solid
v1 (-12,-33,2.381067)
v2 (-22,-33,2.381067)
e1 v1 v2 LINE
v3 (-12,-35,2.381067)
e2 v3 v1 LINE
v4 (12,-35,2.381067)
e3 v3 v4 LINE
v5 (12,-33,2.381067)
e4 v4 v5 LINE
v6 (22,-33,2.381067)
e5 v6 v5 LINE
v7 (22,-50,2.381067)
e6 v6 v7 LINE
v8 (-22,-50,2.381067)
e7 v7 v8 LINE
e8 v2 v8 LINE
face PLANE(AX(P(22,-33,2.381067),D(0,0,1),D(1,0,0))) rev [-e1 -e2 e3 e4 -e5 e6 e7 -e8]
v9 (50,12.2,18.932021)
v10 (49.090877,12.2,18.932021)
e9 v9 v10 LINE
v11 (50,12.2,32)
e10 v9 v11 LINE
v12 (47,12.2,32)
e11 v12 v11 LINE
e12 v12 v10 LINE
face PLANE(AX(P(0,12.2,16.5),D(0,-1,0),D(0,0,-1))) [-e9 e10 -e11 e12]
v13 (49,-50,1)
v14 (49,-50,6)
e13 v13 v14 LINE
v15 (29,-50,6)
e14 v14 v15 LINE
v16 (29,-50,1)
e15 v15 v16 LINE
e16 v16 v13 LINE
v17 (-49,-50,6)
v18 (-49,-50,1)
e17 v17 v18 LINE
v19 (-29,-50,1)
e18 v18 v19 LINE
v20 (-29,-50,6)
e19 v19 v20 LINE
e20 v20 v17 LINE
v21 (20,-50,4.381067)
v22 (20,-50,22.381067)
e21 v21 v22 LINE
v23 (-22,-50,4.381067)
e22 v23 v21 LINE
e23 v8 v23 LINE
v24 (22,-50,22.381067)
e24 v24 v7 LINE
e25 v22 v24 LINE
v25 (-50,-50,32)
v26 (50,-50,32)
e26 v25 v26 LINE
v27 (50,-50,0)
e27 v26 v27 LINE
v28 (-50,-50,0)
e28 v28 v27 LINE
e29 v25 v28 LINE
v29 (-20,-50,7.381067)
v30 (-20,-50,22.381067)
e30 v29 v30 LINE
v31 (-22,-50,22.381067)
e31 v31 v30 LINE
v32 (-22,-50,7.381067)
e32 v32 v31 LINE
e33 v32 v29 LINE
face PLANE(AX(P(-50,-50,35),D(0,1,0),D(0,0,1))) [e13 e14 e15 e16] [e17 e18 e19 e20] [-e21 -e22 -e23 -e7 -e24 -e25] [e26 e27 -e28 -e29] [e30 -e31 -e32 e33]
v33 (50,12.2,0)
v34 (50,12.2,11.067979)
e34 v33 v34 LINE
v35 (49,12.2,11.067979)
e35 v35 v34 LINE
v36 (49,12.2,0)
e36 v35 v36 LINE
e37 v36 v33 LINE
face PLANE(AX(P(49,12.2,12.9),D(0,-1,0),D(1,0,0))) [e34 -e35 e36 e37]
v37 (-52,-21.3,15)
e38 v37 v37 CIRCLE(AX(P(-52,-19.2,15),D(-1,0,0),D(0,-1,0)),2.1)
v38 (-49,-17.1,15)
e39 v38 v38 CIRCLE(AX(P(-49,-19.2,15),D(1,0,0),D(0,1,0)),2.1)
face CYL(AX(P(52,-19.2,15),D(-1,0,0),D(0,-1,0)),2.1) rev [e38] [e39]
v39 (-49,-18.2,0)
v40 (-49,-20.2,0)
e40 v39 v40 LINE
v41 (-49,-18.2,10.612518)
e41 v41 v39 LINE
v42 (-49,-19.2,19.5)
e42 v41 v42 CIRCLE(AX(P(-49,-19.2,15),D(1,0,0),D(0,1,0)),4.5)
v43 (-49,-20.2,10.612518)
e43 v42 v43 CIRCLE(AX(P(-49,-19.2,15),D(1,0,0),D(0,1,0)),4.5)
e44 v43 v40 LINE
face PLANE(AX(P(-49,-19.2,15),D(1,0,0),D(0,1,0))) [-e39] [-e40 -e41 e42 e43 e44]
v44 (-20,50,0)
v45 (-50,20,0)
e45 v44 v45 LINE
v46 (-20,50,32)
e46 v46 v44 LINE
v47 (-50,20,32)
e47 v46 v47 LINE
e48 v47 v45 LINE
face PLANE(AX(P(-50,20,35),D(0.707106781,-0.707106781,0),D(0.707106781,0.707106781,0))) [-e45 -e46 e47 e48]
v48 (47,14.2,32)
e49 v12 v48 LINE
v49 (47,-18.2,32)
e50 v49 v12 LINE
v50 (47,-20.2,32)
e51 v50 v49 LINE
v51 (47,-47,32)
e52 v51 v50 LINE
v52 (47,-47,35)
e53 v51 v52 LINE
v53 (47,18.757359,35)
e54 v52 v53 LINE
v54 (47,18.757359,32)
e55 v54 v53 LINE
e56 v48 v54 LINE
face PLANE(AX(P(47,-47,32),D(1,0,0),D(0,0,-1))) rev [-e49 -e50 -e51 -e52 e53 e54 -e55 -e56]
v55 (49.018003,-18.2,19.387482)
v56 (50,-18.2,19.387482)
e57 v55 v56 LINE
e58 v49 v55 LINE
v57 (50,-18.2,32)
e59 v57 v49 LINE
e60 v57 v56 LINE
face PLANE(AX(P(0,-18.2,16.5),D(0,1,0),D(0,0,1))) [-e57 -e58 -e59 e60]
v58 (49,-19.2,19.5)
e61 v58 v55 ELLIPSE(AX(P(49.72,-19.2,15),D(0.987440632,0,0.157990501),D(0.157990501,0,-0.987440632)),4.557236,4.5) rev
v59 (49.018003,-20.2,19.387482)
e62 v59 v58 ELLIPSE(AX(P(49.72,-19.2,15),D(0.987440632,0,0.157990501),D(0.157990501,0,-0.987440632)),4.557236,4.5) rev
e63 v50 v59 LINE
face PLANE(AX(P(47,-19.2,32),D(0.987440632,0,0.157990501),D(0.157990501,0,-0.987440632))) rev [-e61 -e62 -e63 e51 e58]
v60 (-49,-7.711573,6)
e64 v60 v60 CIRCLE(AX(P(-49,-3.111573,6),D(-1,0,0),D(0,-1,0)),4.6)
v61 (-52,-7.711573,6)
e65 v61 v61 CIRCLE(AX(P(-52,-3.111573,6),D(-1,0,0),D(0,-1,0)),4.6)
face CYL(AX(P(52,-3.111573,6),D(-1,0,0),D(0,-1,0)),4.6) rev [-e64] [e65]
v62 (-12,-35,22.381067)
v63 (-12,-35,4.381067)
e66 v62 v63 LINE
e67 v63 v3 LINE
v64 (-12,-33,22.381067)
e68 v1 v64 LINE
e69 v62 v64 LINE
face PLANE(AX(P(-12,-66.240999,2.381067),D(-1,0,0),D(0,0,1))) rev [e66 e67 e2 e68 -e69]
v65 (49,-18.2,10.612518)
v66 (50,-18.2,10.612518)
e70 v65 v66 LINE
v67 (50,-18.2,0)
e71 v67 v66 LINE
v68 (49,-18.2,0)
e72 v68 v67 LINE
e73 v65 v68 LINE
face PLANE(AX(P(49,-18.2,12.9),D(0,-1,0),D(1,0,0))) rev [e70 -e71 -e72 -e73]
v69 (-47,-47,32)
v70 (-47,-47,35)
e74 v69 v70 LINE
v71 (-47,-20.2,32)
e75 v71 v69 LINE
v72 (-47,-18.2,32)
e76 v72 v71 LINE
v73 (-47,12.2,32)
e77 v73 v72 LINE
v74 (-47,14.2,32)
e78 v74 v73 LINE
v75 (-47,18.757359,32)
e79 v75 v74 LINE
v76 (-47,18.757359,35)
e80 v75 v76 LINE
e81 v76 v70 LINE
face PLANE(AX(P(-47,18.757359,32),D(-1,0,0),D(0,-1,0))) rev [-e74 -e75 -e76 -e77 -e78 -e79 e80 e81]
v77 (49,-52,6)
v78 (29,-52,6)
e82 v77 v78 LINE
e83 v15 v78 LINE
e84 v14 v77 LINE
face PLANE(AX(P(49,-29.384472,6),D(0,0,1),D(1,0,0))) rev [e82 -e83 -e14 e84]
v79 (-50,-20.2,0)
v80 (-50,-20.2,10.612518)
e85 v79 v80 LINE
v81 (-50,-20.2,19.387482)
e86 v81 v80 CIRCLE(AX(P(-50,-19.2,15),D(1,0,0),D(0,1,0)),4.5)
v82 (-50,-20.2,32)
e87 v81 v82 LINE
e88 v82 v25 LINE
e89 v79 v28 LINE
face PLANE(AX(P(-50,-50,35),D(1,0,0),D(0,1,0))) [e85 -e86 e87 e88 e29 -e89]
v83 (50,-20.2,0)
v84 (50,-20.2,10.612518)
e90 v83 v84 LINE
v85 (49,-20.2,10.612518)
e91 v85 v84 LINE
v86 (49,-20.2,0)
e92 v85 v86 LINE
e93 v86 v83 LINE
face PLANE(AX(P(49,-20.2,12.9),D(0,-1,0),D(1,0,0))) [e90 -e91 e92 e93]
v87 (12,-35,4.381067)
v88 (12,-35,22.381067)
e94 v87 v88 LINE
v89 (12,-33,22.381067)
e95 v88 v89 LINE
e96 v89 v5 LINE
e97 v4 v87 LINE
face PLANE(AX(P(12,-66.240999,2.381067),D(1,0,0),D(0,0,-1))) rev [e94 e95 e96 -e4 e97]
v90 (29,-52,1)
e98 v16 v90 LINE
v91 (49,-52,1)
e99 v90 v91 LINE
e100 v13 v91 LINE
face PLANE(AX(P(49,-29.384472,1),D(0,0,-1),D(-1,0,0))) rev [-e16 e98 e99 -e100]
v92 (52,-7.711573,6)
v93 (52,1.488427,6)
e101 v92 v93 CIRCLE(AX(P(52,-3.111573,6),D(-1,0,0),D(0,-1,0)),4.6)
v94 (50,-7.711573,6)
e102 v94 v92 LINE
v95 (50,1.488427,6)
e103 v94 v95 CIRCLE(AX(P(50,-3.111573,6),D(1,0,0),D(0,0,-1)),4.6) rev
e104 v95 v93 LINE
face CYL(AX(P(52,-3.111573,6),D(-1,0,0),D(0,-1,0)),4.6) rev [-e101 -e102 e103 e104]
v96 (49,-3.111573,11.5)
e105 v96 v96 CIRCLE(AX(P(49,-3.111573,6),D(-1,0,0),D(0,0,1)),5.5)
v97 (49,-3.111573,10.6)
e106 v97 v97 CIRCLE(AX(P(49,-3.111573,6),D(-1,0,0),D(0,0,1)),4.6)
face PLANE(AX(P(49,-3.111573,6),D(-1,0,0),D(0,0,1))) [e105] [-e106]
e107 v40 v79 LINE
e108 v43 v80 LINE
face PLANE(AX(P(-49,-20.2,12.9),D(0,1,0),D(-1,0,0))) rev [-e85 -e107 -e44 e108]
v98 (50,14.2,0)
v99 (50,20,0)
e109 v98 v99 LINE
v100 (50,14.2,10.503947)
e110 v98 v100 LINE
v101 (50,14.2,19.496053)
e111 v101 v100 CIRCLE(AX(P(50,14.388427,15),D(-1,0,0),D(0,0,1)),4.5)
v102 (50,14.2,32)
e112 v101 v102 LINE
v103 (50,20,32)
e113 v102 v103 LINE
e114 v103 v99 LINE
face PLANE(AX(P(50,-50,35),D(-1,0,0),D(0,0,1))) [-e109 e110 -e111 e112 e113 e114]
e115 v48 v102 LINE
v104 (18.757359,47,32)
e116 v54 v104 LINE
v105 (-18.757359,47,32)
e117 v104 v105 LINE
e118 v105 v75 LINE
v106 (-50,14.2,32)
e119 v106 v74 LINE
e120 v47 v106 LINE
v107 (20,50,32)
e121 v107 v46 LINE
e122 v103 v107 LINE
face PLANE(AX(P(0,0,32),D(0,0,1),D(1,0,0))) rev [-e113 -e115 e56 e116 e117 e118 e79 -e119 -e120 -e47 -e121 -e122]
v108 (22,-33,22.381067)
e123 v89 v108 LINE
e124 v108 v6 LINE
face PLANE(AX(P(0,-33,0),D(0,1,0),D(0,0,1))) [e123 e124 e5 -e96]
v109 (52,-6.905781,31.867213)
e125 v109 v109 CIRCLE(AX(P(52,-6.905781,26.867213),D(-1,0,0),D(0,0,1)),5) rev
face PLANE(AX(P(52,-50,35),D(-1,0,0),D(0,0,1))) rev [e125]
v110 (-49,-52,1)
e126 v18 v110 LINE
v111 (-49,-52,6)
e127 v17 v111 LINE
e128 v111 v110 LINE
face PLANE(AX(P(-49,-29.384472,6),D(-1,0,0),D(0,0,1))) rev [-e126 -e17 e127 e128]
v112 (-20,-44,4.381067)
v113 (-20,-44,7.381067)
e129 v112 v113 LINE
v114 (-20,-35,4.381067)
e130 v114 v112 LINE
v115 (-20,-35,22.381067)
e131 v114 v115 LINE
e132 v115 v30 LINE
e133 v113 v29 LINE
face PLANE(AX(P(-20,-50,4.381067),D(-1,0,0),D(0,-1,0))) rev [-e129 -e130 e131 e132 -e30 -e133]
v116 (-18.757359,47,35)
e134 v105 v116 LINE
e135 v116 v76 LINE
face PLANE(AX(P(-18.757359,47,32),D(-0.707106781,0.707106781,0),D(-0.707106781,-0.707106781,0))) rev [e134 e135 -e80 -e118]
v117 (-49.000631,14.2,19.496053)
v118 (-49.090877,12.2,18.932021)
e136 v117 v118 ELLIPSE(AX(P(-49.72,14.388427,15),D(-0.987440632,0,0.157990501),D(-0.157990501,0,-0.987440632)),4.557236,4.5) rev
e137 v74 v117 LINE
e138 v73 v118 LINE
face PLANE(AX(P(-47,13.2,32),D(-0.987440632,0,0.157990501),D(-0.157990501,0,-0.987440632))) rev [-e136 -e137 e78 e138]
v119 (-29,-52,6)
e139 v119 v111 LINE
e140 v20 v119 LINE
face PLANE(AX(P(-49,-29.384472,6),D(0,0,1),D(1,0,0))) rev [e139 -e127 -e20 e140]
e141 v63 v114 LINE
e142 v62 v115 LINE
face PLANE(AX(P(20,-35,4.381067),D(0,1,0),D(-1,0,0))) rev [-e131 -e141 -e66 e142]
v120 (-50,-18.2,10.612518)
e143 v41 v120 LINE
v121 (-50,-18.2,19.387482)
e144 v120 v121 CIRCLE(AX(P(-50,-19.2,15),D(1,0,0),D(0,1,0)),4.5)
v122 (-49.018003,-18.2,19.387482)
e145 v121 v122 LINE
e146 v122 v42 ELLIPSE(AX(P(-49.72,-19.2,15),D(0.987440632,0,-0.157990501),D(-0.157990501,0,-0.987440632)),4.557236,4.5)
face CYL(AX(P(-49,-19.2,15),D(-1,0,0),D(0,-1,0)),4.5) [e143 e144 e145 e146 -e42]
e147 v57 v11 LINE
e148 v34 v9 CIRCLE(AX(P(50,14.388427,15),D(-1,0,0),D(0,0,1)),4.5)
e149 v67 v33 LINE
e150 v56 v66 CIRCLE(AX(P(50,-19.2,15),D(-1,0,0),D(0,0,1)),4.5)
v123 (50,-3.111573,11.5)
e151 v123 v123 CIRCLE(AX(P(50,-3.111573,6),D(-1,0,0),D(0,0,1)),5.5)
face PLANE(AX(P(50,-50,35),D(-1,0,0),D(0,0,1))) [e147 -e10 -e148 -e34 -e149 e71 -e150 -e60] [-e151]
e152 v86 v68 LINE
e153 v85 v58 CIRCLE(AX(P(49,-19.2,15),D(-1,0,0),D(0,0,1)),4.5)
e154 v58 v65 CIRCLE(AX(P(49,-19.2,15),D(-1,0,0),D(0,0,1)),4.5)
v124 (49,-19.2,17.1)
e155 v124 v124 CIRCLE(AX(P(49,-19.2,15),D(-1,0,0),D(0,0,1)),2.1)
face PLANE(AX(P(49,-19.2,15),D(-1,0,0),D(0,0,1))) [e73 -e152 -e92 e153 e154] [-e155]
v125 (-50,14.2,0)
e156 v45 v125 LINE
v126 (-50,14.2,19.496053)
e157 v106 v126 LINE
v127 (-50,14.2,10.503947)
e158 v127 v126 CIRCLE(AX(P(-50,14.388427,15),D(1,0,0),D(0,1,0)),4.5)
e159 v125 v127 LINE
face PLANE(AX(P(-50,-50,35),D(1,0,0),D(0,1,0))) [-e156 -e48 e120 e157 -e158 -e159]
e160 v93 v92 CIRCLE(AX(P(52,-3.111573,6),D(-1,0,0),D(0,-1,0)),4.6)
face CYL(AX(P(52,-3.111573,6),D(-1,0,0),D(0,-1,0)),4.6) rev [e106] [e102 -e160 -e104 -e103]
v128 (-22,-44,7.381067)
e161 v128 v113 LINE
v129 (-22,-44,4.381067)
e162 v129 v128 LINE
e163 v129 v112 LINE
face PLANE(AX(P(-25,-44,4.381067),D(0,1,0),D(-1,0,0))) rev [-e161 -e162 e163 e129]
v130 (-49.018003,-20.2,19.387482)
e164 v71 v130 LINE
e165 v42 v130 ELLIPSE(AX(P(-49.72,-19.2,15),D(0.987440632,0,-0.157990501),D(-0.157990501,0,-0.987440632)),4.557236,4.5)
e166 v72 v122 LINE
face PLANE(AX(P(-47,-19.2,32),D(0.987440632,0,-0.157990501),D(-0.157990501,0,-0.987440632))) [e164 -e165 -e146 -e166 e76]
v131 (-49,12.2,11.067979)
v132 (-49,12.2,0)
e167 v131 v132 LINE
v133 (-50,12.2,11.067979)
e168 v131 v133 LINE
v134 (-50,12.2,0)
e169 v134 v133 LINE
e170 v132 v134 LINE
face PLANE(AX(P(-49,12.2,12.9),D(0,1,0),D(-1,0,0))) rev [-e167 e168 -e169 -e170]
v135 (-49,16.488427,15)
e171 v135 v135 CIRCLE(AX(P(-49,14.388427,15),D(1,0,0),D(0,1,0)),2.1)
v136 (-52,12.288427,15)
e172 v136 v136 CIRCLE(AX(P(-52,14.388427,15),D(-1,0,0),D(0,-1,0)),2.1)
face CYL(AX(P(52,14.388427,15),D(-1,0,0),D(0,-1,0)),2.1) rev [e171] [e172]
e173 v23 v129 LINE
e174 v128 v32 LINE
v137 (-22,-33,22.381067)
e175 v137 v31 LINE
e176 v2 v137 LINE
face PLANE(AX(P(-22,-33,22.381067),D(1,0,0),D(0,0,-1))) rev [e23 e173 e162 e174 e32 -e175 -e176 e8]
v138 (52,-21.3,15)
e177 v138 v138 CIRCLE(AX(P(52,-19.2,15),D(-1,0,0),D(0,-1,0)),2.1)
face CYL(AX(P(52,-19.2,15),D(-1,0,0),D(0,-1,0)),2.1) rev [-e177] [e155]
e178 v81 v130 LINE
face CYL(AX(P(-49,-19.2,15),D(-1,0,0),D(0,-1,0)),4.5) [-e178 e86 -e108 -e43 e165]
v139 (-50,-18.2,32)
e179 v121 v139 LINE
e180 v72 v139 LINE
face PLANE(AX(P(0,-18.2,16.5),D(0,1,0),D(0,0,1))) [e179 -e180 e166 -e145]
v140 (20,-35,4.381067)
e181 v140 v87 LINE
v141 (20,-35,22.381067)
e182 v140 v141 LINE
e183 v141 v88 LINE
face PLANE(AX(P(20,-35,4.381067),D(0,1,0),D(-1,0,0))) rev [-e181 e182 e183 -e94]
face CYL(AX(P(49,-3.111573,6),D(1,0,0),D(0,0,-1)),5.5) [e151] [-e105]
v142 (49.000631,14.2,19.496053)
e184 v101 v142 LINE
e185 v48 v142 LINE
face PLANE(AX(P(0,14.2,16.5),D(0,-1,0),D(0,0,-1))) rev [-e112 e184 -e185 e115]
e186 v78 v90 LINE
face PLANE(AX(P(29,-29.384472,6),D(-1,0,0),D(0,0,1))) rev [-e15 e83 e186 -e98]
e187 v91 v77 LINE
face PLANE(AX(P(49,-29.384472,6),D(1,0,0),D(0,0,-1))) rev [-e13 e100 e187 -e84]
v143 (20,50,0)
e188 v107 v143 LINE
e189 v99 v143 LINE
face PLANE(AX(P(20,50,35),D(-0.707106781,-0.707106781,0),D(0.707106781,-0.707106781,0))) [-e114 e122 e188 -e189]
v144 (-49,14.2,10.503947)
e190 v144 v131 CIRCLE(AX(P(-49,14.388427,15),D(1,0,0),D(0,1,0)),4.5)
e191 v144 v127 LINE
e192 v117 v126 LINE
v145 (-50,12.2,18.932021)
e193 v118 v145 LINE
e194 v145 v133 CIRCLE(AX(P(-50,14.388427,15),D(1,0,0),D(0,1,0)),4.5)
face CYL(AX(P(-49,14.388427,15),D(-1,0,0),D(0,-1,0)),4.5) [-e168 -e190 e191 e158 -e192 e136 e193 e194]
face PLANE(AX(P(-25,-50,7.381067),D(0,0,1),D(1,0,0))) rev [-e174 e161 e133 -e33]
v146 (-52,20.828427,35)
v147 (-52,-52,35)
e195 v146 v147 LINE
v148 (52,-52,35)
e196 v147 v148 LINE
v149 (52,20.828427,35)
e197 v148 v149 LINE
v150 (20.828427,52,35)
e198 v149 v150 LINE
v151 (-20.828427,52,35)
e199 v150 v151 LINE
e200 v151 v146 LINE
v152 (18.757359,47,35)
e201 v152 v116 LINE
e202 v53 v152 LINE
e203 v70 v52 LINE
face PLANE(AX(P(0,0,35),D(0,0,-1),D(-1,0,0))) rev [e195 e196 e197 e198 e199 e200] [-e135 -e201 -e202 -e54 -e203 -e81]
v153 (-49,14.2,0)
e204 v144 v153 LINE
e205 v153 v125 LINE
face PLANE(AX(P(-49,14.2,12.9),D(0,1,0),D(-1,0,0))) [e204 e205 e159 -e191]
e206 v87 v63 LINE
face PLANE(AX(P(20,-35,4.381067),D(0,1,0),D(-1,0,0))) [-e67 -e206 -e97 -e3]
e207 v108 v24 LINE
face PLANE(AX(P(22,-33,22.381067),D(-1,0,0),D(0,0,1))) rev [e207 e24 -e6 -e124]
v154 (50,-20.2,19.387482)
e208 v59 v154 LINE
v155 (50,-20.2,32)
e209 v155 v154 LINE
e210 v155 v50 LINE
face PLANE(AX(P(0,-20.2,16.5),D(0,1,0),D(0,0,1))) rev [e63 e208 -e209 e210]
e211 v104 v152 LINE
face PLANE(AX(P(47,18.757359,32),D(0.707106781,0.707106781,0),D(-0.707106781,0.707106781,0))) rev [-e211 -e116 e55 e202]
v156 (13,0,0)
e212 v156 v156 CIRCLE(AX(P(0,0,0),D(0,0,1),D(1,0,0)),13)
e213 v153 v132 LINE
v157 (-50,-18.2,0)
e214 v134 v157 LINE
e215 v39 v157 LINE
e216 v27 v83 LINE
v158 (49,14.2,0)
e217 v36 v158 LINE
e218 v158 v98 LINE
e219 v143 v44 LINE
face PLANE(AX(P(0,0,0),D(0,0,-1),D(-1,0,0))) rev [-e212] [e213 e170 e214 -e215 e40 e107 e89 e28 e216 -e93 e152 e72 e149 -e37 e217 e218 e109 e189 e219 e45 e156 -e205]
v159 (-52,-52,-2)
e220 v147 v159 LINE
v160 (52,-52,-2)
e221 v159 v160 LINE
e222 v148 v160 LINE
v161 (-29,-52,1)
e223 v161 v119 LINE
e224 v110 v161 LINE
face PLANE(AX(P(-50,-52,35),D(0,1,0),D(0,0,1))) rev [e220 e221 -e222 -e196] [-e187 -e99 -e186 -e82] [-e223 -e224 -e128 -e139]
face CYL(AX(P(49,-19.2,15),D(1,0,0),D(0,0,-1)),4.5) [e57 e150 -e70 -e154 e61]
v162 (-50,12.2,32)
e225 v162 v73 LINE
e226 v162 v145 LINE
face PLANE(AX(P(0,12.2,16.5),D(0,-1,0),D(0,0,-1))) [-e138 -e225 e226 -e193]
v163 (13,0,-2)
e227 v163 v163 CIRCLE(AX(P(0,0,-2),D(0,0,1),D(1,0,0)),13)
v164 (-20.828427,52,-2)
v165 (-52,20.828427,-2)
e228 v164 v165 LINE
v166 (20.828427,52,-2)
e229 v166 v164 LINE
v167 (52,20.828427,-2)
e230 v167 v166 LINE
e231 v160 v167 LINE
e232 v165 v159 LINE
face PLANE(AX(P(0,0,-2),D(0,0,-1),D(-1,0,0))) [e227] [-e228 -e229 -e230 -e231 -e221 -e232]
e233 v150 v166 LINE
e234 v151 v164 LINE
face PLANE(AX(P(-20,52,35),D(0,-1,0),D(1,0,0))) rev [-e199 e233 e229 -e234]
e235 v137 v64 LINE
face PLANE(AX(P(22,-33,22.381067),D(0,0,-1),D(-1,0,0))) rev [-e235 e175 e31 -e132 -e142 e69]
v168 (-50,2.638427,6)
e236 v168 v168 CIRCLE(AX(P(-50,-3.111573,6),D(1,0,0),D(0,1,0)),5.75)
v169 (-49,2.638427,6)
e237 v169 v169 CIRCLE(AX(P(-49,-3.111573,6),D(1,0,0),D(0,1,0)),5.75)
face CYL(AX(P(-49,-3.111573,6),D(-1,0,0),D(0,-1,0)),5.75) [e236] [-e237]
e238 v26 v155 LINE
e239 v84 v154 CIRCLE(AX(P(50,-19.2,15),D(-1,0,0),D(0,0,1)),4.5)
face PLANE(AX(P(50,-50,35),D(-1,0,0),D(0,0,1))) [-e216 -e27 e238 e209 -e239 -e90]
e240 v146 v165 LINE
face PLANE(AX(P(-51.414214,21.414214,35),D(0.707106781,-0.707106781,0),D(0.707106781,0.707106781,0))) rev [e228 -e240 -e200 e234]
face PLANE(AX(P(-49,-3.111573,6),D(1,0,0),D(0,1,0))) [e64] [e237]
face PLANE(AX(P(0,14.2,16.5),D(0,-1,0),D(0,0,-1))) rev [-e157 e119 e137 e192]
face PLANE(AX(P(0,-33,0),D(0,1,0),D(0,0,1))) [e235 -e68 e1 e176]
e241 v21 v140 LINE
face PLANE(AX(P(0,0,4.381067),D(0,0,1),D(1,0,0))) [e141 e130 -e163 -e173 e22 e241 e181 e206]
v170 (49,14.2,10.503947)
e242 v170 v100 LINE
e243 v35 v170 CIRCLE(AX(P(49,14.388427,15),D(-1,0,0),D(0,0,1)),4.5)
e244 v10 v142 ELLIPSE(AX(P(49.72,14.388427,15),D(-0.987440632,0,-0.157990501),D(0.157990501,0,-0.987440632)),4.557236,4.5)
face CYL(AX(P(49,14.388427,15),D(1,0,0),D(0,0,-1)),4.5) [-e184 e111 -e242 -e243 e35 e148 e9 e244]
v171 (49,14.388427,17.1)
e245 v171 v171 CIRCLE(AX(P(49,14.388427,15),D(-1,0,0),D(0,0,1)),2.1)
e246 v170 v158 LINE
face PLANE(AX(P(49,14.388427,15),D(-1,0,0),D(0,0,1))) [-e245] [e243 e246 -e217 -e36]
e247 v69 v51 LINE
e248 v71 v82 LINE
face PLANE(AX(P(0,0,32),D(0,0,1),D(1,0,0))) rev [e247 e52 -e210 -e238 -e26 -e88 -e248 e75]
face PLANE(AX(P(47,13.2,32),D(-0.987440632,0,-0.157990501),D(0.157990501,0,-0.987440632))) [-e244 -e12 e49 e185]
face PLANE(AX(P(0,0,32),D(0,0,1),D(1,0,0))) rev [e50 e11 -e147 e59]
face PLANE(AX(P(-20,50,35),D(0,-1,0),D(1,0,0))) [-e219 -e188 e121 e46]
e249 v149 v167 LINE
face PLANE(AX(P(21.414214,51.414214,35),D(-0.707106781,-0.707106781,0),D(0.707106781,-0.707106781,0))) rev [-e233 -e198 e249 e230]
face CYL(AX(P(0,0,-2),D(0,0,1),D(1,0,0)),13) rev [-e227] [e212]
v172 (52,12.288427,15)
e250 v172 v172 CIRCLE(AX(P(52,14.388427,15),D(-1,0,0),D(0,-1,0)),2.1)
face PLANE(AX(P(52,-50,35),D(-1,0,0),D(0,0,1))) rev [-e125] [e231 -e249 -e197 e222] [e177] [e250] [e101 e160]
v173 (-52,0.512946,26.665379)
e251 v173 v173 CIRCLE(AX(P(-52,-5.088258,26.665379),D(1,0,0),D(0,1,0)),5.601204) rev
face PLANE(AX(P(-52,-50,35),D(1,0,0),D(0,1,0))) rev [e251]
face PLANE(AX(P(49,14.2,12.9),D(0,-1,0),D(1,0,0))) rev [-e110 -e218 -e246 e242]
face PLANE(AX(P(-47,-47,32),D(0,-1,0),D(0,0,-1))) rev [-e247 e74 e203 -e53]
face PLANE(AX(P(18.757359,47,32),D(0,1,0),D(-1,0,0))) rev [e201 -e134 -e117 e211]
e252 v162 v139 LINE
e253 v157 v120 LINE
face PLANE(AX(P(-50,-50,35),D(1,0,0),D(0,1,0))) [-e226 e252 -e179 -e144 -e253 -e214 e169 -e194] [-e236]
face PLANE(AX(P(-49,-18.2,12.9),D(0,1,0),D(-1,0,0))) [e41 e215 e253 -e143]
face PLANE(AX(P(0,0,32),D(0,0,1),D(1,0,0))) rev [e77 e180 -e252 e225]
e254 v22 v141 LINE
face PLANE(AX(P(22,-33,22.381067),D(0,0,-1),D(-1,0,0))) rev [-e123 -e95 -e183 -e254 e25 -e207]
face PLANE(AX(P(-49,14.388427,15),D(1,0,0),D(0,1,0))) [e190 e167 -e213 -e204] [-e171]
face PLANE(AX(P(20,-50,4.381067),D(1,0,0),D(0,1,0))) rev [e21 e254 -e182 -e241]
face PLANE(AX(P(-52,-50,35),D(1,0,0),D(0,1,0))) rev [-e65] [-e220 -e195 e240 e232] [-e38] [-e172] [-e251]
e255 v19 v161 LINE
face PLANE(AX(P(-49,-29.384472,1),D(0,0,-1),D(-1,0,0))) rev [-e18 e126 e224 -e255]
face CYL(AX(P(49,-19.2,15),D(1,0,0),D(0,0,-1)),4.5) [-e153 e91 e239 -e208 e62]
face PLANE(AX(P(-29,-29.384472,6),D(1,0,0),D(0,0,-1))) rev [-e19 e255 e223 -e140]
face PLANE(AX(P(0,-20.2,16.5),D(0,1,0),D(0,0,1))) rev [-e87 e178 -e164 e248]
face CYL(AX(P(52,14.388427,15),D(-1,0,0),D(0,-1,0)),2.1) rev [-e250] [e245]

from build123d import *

# Parameters (mm, degrees)
BOSS_EXTRU_1_DEPTH       = 35
COQUE3_T                 = 2
ESQUISSE3_R              = 13
ENL_V_MAT_EXTRU_1_DEPTH  = 82.443231763
ESQUISSE5_W              = 20
ESQUISSE5_H              = 5
ENL_V_MAT_EXTRU_3_DEPTH  = 2
ESQUISSE6_R              = 4.6
ENL_V_MAT_EXTRU_4_DEPTH  = 122.428991596
ESQUISSE7_R              = 2.1
ENL_V_MAT_EXTRU_5_DEPTH  = 122.428991596
ESQUISSE8_W              = 44
ESQUISSE8_H              = 20
BOSS_EXTRU_2_DEPTH       = 17
ESQUISSE9_W              = 40
ESQUISSE9_H              = 15
ENL_V_MAT_EXTRU_7_DEPTH  = 18
ESQUISSE10_W             = 3
ESQUISSE10_H             = 6
ENL_V_MAT_EXTRU_8_DEPTH  = 5
BOSS_EXTRU_4_DEPTH       = 3
ESQUISSE22_R             = 4.5
BOSS_EXTRU_7_DEPTH       = 1
ENL_V_START              = -3
ESQUISSE24_R             = 2.1
ENL_V_MAT_EXTRU_12_DEPTH = 3
ESQUISSE20_R             = 4.5
BOSS_EXTRU_8_DEPTH       = 1
ESQUISSE25_R             = 2.1
ENL_V_MAT_EXTRU_13_DEPTH = 3
BOSS_EXTRU_9_START       = 1
ESQUISSE26_R             = 4.5
BOSS_EXTRU_9_DEPTH       = 1
ESQUISSE27_R             = 2.1
ENL_V_MAT_EXTRU_14_DEPTH = 3
BOSS_EXTRU_10_START      = 1
ESQUISSE28_R             = 4.5
BOSS_EXTRU_10_DEPTH      = 1
ESQUISSE29_R             = 2.1
ENL_V_MAT_EXTRU_15_DEPTH = 3
ESQUISSE34_R             = 5.75
BOSS_EXTRU_16_DEPTH      = 1
ESQUISSE35_R             = 4.6
ENL_V_MAT_EXTRU_19_DEPTH = 1
ESQUISSE36_R             = 5.5
BOSS_EXTRU_17_DEPTH      = 1
ESQUISSE37_R             = 4.6
ENL_V_MAT_EXTRU_20_DEPTH = 1
NERVURE3_REACH           = 96.86
ESQUISSE38_WALL_W        = 204.379203954
ESQUISSE38_WALL_H        = 2
NERVURE4_REACH           = 120.87
ESQUISSE39_WALLS_W       = 252.639353074
ESQUISSE39_WALLS_H       = 2
ESQUISSE40_W             = 24
ESQUISSE40_H             = 20
ENL_V_MAT_EXTRU_21_DEPTH = 2
SYM_TRIE2_START          = 12.2
SYM_TRIE2_OUTLINE_W      = 1
SYM_TRIE2_OUTLINE_H      = 11.067979308
SYM_TRIE2_DEPTH          = 2


with BuildPart() as part:
    # Esquisse1 → Boss.-Extru.1 (new body)
    with BuildSketch(Plane.XY):
        Polygon((-50, 20), (-20, 50), (20, 50), (50, 20), (50, -50), (-50, -50), align=None)
    extrude(amount=BOSS_EXTRU_1_DEPTH)

    # Coque3
    coque3_openings = [part.faces().sort_by_distance(p)[0] for p in [
        (0, -3.956043956, 35),
    ]]
    offset(amount=COQUE3_T, openings=coque3_openings, kind=Kind.INTERSECTION)

    # Esquisse3 → Enlèv. mat.-Extru.1 (cut, through all)
    with BuildSketch(Plane.XY):
        Circle(ESQUISSE3_R)
    extrude(amount=-ENL_V_MAT_EXTRU_1_DEPTH, mode=Mode.SUBTRACT)

    # Esquisse5 → Enlèv. mat.-Extru.3 (cut)
    with BuildSketch(Plane.XZ.offset(52)):
        with Locations((39, 3.5)):
            Rectangle(ESQUISSE5_W, ESQUISSE5_H)
        with Locations((-39, 3.5)):
            Rectangle(ESQUISSE5_W, ESQUISSE5_H)
    extrude(amount=-ENL_V_MAT_EXTRU_3_DEPTH, mode=Mode.SUBTRACT)

    # Esquisse6 → Enlèv. mat.-Extru.4 (cut, through all)
    with BuildSketch(Plane.ZY.offset(52)):
        with Locations(Location((6, -3.111572875, 0), (0, 0, 270))):
            Circle(ESQUISSE6_R)
    extrude(amount=-ENL_V_MAT_EXTRU_4_DEPTH, mode=Mode.SUBTRACT)

    # Esquisse7 → Enlèv. mat.-Extru.5 (cut, through all)
    with BuildSketch(Plane.ZY.offset(52)):
        with Locations(Location((15, 14.388427125, 0), (0, 0, 270))):
            Circle(ESQUISSE7_R)
        with Locations(Location((15, -19.2, 0), (0, 0, 270))):
            Circle(ESQUISSE7_R)
    extrude(amount=-ENL_V_MAT_EXTRU_5_DEPTH, mode=Mode.SUBTRACT)

    # Esquisse8 → Boss.-Extru.2 (add)
    with BuildSketch(Plane(origin=(0, -50, 0), x_dir=(1, 0, 0), z_dir=(0, 1, 0))):
        with Locations((0, -12.381067223)):
            Rectangle(ESQUISSE8_W, ESQUISSE8_H)
    extrude(amount=BOSS_EXTRU_2_DEPTH)

    # Esquisse9 → Enlèv. mat.-Extru.7 (cut)
    with BuildSketch(Plane.XY.offset(22.381067223)):
        with Locations((0, -42.5)):
            Rectangle(ESQUISSE9_W, ESQUISSE9_H)
    extrude(amount=-ENL_V_MAT_EXTRU_7_DEPTH, mode=Mode.SUBTRACT)

    # Esquisse10 → Enlèv. mat.-Extru.8 (cut)
    with BuildSketch(Plane(origin=(-20, 0, 0), x_dir=(0, 0, -1), z_dir=(1, 0, 0))):
        with Locations((-5.881067223, -47)):
            Rectangle(ESQUISSE10_W, ESQUISSE10_H)
    extrude(amount=-ENL_V_MAT_EXTRU_8_DEPTH, mode=Mode.SUBTRACT)

    # Esquisse17 → Boss.-Extru.4 (add)
    with BuildSketch(Plane.XY.offset(35)):
        Polygon((50, -50), (50, 20), (20, 50), (-20, 50), (-50, 20), (-50, -50), align=None)
        Polygon((-47, -47), (47, -47), (47, 18.757359313), (18.757359313, 47), (-18.757359313, 47), (-47, 18.757359313), align=None, mode=Mode.SUBTRACT)
    extrude(amount=-BOSS_EXTRU_4_DEPTH)

    # Esquisse22 → Boss.-Extru.7 (add)
    with BuildSketch(Plane(origin=(-50, 0, 0), x_dir=(0, 0, -1), z_dir=(1, 0, 0))):
        with Locations(Location((-15, -19.2, 0), (0, 0, 90))):
            Circle(ESQUISSE22_R)
    extrude(amount=BOSS_EXTRU_7_DEPTH)

    # Esquisse24 → Enlèv. mat.-Extru.12 (cut)
    with BuildSketch(Plane(origin=(-49, 0, 0), x_dir=(0, 0, -1), z_dir=(1, 0, 0)).offset(ENL_V_START)):
        with Locations(Location((-15, -19.2, 0), (0, 0, 270))):
            Circle(ESQUISSE24_R)
    extrude(amount=ENL_V_MAT_EXTRU_12_DEPTH, mode=Mode.SUBTRACT)

    # Esquisse20 → Boss.-Extru.8 (add)
    with BuildSketch(Plane(origin=(-50, 0, 0), x_dir=(0, 0, -1), z_dir=(1, 0, 0))):
        with Locations(Location((-15, 14.388427125, 0), (0, 0, 90))):
            Circle(ESQUISSE20_R)
    extrude(amount=BOSS_EXTRU_8_DEPTH)

    # Esquisse25 → Enlèv. mat.-Extru.13 (cut)
    with BuildSketch(Plane.ZY.offset(50)):
        with Locations(Location((15, 14.388427125, 0), (0, 0, 270))):
            Circle(ESQUISSE25_R)
    extrude(amount=-ENL_V_MAT_EXTRU_13_DEPTH, mode=Mode.SUBTRACT)

    # Esquisse26 → Boss.-Extru.9 (add)
    with BuildSketch(Plane.ZY.offset(-50).offset(BOSS_EXTRU_9_START)):
        with Locations(Location((15, 14.388427125, 0), (0, 0, 90))):
            Circle(ESQUISSE26_R)
    extrude(amount=-BOSS_EXTRU_9_DEPTH)

    # Esquisse27 → Enlèv. mat.-Extru.14 (cut)
    with BuildSketch(Plane(origin=(50, 0, 0), x_dir=(0, 0, -1), z_dir=(1, 0, 0)).offset(ENL_V_START)):
        with Locations(Location((-15, 14.388427125, 0), (0, 0, 270))):
            Circle(ESQUISSE27_R)
    extrude(amount=ENL_V_MAT_EXTRU_14_DEPTH, mode=Mode.SUBTRACT)

    # Esquisse28 → Boss.-Extru.10 (add)
    with BuildSketch(Plane.ZY.offset(-50).offset(BOSS_EXTRU_10_START)):
        with Locations(Location((15, -19.2, 0), (0, 0, 90))):
            Circle(ESQUISSE28_R)
    extrude(amount=-BOSS_EXTRU_10_DEPTH)

    # Esquisse29 → Enlèv. mat.-Extru.15 (cut)
    with BuildSketch(Plane.ZY.offset(-49)):
        with Locations(Location((15, -19.2, 0), (0, 0, 270))):
            Circle(ESQUISSE29_R)
    extrude(amount=-ENL_V_MAT_EXTRU_15_DEPTH, mode=Mode.SUBTRACT)

    # Esquisse34 → Boss.-Extru.16 (add)
    with BuildSketch(Plane(origin=(-50, 0, 0), x_dir=(0, 0, -1), z_dir=(1, 0, 0))):
        with Locations(Location((-6, -3.111572875, 0), (0, 0, 90))):
            Circle(ESQUISSE34_R)
    extrude(amount=BOSS_EXTRU_16_DEPTH)

    # Esquisse35 → Enlèv. mat.-Extru.19 (cut)
    with BuildSketch(Plane.ZY.offset(50)):
        with Locations(Location((6, -3.111572875, 0), (0, 0, 270))):
            Circle(ESQUISSE35_R)
    extrude(amount=-ENL_V_MAT_EXTRU_19_DEPTH, mode=Mode.SUBTRACT)

    # Esquisse36 → Boss.-Extru.17 (add)
    with BuildSketch(Plane.ZY.offset(-50)):
        with Locations((6, -3.111572875)):
            Circle(ESQUISSE36_R)
    extrude(amount=BOSS_EXTRU_17_DEPTH)

    # Esquisse37 → Enlèv. mat.-Extru.20 (cut)
    with BuildSketch(Plane.ZY.offset(-49)):
        with Locations(Location((6, -3.111572875, 0), (0, 0, 270))):
            Circle(ESQUISSE37_R)
    extrude(amount=-ENL_V_MAT_EXTRU_20_DEPTH, mode=Mode.SUBTRACT)

    # Esquisse38 wall → Nervure3 (add, up to next)
    with BuildSketch(Plane(origin=(-48, -19.2, 25.75), x_dir=(-0.157990501107, 0, -0.987440631917), z_dir=(-0.987440631917, 0, 0.157990501107)), mode=Mode.PRIVATE) as nervure3_sk1:
        Rectangle(ESQUISSE38_WALL_W, ESQUISSE38_WALL_H)
    nervure3_tool1 = extrude(nervure3_sk1.sketch, amount=NERVURE3_REACH, mode=Mode.PRIVATE) - part.part
    nervure3 = nervure3_tool1.solids().sort_by_distance((-48, -19.2, 25.75))[0]
    add(nervure3)

    # Esquisse39 walls → Nervure4 (add, up to next)
    with BuildSketch(Plane(origin=(-49, 0, 0), x_dir=(0, 0, -1), z_dir=(1, 0, 0)), mode=Mode.PRIVATE) as nervure4_sk1:
        with Locations((-6.45, -19.2)):
            Rectangle(ESQUISSE39_WALLS_W, ESQUISSE39_WALLS_H)
    nervure4_tool1 = extrude(nervure4_sk1.sketch, amount=-NERVURE4_REACH, mode=Mode.PRIVATE) - part.part
    nervure4 = nervure4_tool1.solids().sort_by_distance((-49, -19.2, 6.45))[0]
    add(nervure4)

    # Esquisse40 → Enlèv. mat.-Extru.21 (cut)
    with BuildSketch(Plane(origin=(0, -33, 0), x_dir=(1, 0, 0), z_dir=(0, 1, 0))):
        with Locations((0, -12.381067223)):
            Rectangle(ESQUISSE40_W, ESQUISSE40_H)
    extrude(amount=-ENL_V_MAT_EXTRU_21_DEPTH, mode=Mode.SUBTRACT)

    # Symétrie1: Nervure3, Nervure4 across plane
    add(nervure3.mirror(Plane(origin=(0, 0, 0), x_dir=(0, 0, 1), z_dir=(1, 0, 0))))
    add(nervure4.mirror(Plane(origin=(0, 0, 0), x_dir=(0, 0, 1), z_dir=(1, 0, 0))))

    # Symétrie2: read off the stored shape, not the designer's step
    # Symétrie2 outline → Symétrie2 (add)
    with BuildSketch(Plane(origin=(0, 0, 0), x_dir=(1, 0, 0), z_dir=(0, 1, 0)).offset(SYM_TRIE2_START)):
        Polygon((47, -32), (50, -32), (50, -18.932020692), (49.090876689, -18.932020692), align=None)
        with Locations((49.5, -5.533989654)):
            Rectangle(SYM_TRIE2_OUTLINE_W, SYM_TRIE2_OUTLINE_H)
        Polygon((-49.090876689, -18.932020692), (-50, -18.932020692), (-50, -32), (-47, -32), align=None)
        with Locations((-49.5, -5.533989654)):
            Rectangle(SYM_TRIE2_OUTLINE_W, SYM_TRIE2_OUTLINE_H)
    extrude(amount=SYM_TRIE2_DEPTH)


solid = part.part
